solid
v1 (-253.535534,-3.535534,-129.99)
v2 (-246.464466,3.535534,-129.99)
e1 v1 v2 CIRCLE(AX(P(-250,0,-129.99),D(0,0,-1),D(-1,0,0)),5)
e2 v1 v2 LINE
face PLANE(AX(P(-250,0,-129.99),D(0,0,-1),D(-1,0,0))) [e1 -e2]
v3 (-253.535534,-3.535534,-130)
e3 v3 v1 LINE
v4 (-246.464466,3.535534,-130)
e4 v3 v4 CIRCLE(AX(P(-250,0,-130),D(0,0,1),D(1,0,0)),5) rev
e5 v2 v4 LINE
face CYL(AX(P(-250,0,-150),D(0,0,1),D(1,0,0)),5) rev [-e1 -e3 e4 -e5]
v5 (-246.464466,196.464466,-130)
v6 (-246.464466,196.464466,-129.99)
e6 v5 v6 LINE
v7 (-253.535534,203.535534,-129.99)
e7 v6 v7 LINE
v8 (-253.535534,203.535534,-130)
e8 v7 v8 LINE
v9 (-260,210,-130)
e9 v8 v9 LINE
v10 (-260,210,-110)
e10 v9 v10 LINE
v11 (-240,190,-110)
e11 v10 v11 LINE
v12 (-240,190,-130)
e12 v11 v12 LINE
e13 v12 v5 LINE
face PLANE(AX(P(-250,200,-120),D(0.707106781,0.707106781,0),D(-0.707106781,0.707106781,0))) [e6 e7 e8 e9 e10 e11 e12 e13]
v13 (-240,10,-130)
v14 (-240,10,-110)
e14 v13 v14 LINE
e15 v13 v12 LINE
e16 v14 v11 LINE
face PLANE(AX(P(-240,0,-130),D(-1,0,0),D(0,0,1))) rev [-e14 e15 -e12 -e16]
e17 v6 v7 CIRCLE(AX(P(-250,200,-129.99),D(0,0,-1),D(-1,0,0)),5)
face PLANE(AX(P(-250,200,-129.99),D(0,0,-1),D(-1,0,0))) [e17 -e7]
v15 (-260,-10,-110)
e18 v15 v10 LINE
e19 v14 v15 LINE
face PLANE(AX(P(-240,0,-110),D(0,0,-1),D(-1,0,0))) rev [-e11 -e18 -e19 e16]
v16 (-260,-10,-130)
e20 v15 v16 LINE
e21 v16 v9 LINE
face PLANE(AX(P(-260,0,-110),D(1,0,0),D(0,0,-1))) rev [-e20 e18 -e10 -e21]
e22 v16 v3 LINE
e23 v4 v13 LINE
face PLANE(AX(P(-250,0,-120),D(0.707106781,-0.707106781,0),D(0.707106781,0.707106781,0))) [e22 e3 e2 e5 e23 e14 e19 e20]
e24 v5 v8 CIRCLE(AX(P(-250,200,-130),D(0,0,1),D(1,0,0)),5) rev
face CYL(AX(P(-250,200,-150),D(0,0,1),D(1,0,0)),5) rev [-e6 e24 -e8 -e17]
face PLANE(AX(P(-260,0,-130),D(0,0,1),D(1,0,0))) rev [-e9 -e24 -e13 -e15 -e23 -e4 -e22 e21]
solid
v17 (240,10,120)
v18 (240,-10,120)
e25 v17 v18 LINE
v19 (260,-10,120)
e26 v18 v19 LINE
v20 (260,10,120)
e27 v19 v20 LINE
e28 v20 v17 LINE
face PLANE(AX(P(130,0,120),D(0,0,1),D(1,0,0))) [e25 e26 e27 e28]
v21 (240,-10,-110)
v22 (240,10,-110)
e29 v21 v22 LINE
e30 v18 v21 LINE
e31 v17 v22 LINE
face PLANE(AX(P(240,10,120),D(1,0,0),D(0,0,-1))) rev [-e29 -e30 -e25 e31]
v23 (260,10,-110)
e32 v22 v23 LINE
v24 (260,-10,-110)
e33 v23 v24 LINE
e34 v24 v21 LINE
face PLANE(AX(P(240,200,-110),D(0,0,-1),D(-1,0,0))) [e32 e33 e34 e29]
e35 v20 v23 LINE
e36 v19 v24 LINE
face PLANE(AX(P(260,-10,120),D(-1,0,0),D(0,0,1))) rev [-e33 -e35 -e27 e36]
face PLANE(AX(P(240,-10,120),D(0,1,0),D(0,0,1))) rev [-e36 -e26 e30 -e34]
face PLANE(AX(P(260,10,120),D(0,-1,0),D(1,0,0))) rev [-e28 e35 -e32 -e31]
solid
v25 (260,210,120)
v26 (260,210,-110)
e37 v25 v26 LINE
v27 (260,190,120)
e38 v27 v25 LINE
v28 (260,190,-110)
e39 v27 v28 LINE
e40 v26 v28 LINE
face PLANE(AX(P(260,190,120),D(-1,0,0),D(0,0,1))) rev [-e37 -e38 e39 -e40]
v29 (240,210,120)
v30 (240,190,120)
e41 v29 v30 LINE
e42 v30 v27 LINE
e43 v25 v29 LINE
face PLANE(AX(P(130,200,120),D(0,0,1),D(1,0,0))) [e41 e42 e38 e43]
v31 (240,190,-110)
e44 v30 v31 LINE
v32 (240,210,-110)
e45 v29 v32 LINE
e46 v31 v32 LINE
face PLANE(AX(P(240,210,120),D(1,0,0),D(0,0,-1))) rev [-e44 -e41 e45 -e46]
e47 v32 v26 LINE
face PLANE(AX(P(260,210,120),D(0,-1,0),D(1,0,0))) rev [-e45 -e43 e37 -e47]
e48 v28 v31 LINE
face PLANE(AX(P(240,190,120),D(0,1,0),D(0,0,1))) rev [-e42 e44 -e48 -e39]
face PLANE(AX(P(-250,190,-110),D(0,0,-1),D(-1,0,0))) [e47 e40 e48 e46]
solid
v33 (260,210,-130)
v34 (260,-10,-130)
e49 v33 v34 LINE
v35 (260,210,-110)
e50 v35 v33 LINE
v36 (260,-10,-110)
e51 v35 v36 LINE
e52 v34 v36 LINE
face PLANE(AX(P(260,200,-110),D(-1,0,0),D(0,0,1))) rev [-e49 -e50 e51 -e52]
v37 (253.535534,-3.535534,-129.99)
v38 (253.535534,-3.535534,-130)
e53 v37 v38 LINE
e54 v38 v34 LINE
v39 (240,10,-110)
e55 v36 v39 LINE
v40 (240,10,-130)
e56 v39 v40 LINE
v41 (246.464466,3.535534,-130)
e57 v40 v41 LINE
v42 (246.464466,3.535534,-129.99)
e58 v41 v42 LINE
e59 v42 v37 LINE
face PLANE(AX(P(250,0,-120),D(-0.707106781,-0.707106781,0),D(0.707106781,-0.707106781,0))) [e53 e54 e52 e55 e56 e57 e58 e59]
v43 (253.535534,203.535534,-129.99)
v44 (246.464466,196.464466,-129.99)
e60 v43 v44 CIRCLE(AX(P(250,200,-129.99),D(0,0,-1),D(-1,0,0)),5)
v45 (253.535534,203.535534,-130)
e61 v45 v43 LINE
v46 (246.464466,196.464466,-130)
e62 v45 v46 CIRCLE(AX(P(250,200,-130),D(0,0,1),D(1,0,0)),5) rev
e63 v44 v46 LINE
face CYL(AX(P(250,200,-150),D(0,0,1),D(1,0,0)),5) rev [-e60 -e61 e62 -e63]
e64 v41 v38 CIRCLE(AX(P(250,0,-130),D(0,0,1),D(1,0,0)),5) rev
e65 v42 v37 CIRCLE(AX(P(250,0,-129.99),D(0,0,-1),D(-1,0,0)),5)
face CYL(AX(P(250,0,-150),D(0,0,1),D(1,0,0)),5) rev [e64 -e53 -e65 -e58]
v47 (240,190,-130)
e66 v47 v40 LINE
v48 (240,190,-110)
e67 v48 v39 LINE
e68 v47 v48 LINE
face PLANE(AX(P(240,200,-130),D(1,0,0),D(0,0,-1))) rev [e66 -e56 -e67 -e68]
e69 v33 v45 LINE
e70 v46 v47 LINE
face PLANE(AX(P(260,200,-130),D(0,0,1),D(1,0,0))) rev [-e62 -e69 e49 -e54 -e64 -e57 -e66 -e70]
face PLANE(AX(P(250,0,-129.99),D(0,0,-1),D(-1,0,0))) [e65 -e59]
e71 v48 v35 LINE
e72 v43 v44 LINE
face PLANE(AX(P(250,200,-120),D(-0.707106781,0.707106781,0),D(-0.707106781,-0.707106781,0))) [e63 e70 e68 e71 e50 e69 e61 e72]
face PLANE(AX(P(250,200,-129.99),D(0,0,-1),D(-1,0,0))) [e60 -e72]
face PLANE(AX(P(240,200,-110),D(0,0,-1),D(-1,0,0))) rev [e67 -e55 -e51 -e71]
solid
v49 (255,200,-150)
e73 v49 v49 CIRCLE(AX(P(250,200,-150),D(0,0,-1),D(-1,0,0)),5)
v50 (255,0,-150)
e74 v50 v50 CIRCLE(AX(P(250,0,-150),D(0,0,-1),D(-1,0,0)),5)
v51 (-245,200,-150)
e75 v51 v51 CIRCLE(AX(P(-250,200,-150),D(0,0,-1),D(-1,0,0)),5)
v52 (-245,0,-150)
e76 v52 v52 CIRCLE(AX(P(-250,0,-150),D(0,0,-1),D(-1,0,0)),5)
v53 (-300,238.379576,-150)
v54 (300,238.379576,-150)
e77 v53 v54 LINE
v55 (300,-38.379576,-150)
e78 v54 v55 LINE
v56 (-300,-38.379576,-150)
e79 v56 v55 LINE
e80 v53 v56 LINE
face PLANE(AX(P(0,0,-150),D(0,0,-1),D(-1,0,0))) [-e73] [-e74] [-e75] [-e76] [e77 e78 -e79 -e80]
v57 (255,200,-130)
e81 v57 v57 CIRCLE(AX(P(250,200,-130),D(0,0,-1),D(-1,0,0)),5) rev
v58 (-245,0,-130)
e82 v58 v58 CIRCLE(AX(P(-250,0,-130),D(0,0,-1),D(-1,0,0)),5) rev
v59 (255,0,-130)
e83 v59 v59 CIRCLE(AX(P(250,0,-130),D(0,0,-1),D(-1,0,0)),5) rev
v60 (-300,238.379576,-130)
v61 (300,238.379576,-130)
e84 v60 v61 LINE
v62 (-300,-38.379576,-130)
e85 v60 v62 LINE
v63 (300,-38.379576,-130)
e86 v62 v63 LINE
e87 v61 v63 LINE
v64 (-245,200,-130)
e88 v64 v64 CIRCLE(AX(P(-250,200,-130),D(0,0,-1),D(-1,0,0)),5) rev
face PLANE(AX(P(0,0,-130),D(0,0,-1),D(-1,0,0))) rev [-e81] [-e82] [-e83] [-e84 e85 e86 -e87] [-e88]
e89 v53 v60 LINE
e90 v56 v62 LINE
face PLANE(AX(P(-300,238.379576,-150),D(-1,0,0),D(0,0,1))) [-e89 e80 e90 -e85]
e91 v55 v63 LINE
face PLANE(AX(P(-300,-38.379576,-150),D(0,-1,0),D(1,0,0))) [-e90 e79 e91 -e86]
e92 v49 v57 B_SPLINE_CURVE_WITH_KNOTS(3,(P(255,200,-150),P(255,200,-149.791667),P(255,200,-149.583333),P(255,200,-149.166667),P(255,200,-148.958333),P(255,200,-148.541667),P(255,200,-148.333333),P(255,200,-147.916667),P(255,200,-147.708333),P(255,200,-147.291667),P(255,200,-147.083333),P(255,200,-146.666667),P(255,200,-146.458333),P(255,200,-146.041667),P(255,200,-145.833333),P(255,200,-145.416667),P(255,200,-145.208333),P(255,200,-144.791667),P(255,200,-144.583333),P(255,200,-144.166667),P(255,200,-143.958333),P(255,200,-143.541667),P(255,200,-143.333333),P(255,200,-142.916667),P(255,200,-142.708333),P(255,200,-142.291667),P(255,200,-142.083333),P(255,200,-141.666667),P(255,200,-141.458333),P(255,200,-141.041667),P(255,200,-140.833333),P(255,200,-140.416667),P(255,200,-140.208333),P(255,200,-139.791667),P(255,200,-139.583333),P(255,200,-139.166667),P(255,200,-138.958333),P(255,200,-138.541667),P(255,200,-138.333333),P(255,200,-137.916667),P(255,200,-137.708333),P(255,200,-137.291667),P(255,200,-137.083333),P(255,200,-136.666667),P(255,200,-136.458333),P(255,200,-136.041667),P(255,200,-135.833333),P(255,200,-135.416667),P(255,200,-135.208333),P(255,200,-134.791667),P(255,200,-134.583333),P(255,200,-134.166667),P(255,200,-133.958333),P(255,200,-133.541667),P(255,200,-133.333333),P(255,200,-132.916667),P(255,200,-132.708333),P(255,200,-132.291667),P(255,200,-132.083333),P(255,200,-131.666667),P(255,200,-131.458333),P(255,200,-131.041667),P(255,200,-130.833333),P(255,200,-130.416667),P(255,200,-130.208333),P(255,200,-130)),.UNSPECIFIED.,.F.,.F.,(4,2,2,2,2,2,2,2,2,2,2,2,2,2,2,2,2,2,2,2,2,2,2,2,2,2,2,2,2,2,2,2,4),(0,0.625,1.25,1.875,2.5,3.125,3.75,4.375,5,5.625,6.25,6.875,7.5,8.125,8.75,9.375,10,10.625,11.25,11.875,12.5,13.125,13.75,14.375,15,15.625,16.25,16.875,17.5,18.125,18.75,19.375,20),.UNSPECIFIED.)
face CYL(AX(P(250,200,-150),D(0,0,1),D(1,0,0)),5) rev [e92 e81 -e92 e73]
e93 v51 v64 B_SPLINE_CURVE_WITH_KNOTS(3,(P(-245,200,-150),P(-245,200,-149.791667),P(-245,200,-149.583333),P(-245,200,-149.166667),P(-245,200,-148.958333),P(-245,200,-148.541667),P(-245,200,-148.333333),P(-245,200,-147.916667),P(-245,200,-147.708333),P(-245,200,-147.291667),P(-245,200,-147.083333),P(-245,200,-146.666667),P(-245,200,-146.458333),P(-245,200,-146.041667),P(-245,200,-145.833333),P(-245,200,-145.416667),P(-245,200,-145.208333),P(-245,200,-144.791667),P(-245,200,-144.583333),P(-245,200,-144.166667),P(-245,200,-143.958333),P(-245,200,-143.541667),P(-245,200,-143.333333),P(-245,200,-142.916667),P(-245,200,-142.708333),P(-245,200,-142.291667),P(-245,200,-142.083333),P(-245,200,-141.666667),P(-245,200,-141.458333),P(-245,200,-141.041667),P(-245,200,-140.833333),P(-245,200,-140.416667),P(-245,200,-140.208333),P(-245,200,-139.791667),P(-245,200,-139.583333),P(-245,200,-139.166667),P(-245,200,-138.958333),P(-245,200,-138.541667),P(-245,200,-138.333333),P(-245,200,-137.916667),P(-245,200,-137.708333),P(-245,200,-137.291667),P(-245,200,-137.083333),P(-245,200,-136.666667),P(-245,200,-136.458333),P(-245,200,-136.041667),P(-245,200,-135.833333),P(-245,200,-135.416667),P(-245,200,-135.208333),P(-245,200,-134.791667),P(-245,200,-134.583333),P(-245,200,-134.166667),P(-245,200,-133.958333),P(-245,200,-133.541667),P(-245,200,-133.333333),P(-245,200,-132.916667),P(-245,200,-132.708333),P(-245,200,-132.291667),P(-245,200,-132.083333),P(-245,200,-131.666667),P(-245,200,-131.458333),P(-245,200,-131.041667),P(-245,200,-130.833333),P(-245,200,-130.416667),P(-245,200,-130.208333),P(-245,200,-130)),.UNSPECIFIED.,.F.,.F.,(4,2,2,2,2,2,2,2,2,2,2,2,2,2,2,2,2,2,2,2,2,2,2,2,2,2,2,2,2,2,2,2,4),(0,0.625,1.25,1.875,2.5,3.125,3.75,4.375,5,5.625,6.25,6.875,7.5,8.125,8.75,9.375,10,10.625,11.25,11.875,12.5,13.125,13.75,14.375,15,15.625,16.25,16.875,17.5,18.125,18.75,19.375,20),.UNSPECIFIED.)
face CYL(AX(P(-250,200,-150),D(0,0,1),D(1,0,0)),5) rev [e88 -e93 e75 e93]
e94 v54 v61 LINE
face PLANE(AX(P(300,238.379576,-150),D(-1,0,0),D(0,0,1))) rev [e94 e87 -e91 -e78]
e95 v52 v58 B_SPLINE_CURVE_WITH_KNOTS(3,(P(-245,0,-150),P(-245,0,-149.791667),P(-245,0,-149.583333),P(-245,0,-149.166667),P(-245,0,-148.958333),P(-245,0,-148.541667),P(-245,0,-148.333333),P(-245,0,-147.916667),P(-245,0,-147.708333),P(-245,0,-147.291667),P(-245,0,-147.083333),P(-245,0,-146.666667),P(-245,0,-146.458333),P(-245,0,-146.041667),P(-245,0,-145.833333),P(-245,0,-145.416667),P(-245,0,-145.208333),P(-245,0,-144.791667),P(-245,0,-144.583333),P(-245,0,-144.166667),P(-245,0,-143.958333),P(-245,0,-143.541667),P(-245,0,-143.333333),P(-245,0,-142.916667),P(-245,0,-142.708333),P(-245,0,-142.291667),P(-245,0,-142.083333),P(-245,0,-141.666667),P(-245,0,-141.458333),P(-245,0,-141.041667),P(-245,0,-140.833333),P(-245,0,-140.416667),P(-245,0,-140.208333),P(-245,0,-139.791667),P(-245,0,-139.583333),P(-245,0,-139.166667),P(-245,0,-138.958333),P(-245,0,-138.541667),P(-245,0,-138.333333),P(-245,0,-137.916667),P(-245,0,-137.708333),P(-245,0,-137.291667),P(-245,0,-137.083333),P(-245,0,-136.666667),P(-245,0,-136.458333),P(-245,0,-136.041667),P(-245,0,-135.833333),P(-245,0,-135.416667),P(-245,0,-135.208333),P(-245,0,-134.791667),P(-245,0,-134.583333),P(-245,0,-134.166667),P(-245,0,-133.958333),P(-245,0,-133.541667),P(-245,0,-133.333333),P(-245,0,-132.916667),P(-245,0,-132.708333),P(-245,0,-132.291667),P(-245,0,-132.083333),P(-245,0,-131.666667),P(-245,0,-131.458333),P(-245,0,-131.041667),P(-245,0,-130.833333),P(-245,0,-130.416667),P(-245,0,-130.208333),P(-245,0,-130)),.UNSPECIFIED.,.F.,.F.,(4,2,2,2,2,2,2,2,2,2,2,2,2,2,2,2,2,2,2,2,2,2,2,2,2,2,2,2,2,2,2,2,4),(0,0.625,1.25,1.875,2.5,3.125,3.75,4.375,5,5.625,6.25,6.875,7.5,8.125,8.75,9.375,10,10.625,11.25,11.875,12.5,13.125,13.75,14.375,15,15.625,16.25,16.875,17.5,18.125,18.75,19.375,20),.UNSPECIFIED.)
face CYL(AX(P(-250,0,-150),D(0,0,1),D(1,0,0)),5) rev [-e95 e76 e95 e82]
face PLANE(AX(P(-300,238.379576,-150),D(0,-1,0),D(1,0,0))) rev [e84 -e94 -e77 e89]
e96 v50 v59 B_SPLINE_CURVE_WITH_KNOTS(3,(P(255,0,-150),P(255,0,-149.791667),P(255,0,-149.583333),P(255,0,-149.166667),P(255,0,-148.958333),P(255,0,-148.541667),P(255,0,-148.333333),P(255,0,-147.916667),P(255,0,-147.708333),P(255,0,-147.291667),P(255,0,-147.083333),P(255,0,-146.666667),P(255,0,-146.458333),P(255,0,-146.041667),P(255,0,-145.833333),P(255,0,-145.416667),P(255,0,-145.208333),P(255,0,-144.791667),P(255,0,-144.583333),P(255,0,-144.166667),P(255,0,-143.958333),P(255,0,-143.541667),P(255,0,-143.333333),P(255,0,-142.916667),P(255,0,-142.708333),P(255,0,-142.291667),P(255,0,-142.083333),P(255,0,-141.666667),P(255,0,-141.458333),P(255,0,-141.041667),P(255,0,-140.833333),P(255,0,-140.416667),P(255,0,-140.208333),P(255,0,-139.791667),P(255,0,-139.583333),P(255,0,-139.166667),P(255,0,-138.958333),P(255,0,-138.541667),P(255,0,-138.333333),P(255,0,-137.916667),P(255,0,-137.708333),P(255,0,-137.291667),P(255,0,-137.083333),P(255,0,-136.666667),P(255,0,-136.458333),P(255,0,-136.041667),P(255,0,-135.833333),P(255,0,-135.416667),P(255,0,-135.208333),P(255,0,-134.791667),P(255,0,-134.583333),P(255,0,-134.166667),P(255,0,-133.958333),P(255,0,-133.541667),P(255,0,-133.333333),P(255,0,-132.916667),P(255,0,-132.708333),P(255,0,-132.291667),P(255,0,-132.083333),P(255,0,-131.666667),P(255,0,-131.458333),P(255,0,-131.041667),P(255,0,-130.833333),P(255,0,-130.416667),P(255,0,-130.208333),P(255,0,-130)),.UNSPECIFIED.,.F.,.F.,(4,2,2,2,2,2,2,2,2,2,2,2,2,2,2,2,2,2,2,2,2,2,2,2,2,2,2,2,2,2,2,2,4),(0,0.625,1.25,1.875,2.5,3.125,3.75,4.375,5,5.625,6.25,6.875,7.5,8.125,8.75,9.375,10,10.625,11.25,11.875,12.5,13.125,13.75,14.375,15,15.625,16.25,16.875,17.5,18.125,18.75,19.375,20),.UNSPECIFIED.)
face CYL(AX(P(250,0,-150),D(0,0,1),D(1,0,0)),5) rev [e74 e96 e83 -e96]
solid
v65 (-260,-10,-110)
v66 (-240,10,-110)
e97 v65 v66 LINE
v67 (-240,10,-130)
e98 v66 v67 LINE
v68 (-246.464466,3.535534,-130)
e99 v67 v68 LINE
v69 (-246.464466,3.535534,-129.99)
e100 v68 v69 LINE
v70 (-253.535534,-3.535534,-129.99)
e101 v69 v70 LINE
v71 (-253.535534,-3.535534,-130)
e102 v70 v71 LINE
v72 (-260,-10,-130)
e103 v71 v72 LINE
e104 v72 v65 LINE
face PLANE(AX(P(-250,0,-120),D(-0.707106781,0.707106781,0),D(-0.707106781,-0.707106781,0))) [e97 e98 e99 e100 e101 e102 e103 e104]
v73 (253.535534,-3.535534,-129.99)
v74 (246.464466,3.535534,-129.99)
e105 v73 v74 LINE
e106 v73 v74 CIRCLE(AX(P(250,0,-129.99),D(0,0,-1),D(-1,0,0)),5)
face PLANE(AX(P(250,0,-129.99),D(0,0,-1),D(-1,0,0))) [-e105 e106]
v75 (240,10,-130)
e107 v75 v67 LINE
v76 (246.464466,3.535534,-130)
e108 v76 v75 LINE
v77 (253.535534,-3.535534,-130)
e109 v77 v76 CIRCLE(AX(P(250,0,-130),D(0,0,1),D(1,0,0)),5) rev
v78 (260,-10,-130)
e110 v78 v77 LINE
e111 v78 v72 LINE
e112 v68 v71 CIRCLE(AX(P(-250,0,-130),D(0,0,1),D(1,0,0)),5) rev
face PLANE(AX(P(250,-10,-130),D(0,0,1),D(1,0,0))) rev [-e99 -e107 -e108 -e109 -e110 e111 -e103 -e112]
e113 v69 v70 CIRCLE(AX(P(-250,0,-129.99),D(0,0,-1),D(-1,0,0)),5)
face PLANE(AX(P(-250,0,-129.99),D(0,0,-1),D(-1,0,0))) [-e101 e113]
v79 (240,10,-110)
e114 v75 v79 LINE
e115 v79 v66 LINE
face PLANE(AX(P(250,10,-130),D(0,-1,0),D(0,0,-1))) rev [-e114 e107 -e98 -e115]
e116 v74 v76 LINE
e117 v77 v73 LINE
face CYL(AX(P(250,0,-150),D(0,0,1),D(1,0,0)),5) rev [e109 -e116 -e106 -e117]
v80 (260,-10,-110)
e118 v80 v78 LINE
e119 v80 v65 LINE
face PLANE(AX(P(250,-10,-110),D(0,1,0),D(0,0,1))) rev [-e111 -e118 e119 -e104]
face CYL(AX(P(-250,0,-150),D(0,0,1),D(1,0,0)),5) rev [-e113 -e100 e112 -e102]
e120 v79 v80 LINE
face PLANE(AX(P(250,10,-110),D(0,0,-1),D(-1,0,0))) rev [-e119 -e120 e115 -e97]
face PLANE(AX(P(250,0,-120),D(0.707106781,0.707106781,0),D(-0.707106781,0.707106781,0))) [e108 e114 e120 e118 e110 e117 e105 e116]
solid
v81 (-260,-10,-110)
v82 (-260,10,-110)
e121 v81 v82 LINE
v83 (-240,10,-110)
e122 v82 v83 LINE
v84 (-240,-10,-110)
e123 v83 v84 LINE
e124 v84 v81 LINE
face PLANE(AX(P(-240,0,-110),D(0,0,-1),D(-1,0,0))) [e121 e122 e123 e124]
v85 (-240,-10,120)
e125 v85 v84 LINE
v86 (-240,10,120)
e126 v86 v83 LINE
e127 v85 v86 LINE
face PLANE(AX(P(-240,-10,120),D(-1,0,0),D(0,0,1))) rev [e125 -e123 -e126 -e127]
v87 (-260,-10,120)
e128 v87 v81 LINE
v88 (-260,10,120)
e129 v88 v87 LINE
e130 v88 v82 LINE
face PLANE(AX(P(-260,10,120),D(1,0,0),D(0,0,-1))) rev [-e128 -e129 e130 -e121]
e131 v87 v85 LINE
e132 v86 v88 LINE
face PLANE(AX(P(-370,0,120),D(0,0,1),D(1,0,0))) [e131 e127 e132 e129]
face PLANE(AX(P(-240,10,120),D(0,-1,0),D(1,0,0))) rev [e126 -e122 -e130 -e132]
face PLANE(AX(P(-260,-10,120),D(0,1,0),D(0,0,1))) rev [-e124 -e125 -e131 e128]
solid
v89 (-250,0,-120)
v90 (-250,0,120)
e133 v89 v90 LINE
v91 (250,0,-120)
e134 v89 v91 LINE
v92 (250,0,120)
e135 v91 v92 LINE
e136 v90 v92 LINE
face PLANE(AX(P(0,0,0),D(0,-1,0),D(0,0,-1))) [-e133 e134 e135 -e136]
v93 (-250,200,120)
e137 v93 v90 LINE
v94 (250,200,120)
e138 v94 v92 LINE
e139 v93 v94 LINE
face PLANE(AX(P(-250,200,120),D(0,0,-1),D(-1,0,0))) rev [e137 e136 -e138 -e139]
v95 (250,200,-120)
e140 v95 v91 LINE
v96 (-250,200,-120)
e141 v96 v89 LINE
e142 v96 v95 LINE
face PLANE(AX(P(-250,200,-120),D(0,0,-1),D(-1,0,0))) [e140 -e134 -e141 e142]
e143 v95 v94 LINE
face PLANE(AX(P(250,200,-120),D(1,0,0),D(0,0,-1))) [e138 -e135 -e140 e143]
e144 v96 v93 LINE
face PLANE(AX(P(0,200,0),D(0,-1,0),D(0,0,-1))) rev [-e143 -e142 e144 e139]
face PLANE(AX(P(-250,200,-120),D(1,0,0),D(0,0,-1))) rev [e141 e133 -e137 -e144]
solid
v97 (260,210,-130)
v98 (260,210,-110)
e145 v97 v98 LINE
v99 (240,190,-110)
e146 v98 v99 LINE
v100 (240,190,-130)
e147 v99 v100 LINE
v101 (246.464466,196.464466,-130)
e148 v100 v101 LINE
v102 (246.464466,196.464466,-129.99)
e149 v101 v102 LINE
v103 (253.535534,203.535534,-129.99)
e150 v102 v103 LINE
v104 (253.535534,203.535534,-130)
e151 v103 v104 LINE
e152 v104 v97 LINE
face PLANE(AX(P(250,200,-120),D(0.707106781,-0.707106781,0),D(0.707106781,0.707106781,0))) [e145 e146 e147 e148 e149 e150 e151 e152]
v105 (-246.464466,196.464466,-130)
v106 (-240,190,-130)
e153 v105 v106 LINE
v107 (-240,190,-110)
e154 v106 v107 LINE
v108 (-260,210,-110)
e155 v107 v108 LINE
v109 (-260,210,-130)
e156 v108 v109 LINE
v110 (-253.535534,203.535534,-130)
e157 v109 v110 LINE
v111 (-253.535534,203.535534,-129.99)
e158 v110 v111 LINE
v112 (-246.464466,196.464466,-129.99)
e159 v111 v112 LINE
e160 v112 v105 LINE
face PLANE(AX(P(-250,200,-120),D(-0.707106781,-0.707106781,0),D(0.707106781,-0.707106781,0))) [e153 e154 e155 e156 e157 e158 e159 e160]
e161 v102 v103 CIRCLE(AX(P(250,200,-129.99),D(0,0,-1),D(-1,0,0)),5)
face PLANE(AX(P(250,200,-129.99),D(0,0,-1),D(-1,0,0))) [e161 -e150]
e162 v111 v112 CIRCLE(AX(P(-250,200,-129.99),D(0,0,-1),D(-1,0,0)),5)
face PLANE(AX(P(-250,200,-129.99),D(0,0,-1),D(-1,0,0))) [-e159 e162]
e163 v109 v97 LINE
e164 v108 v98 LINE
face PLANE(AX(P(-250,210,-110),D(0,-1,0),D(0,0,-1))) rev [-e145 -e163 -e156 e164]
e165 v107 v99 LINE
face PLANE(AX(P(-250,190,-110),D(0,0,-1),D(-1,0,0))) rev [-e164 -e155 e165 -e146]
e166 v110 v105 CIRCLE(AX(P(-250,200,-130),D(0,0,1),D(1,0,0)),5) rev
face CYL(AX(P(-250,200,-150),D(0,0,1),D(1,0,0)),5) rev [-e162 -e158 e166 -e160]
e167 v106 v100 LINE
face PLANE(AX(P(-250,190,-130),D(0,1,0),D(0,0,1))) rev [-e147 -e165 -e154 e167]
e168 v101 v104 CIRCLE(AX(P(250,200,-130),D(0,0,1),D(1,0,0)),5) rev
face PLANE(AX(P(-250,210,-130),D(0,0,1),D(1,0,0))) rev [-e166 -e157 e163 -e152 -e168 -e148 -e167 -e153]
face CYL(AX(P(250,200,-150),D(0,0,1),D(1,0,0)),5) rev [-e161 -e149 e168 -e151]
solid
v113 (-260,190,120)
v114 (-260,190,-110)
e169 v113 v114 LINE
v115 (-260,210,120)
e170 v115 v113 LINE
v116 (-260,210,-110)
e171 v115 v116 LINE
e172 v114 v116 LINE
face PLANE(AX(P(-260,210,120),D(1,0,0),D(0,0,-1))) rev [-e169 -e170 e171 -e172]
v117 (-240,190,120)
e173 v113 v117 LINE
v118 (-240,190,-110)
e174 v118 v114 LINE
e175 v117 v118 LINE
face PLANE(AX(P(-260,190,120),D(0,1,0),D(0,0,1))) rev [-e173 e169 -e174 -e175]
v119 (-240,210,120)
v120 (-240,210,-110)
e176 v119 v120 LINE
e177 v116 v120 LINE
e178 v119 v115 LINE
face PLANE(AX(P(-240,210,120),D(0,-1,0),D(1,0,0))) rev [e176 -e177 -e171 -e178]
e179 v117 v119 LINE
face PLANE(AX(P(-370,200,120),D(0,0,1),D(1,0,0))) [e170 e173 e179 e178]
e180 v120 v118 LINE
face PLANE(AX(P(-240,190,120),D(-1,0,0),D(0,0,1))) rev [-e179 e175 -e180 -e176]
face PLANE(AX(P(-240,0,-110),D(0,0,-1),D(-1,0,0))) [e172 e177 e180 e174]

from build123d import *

# Parameters (mm, degrees)
SKETCH2_W                               = 500
SKETCH2_H                               = 240
BOSS_EXTRUDE1_DEPTH                     = 200
SQUARE_RODS_START                       = -10
SQUARE_RODS_SQUARE_BAR_20_2_OUTLINE_W   = 20
SQUARE_RODS_SQUARE_BAR_20_2_OUTLINE_H   = 230
SQUARE_RODS_SQUARE_BAR_20_2_DEPTH       = 20
SQUARE_RODS_START_2                     = -130
SQUARE_RODS_SQUARE_BAR_20_2_2_DEPTH     = 20
SQUARE_RODS_SQUARE_BAR_20_2_3_DEPTH     = 20
SQUARE_RODS_SQUARE_BAR_20_2_4_OUTLINE_W = 20
SQUARE_RODS_SQUARE_BAR_20_2_4_OUTLINE_H = 230
SQUARE_RODS_SQUARE_BAR_20_2_4_DEPTH     = 20
SQUARE_RODS_SQUARE_BAR_20_2_5_DEPTH     = 20
SQUARE_RODS_START_3                     = 190
SQUARE_RODS_SQUARE_BAR_20_2_6_OUTLINE_W = 20
SQUARE_RODS_SQUARE_BAR_20_2_6_OUTLINE_H = 230
SQUARE_RODS_SQUARE_BAR_20_2_6_DEPTH     = 20
SQUARE_RODS_SQUARE_BAR_20_2_7_DEPTH     = 20
SQUARE_RODS_SQUARE_BAR_20_2_8_OUTLINE_W = 20
SQUARE_RODS_SQUARE_BAR_20_2_8_OUTLINE_H = 230
SQUARE_RODS_SQUARE_BAR_20_2_8_DEPTH     = 20
SKETCH8_W                               = 600
SKETCH8_H                               = 276.75915278
BOSS_EXTRUDE2_DEPTH                     = 20
CUT_EXTRUDE4_DEPTH                      = 458.520297298
CUT_EXTRUDE4_DEPTH_BACK                 = 0.01
SKETCH9_R                               = 5


# Read off the part's stored shape, not the designer's step: Square-rods SQUARE BAR 20(2)
with BuildPart() as part:
    # Sketch2 → Boss-Extrude1 (new body)
    with BuildSketch(Plane(origin=(0, 0, 0), x_dir=(1, 0, 0), z_dir=(0, 1, 0))):
        Rectangle(SKETCH2_W, SKETCH2_H)
    extrude(amount=BOSS_EXTRUDE1_DEPTH)


with BuildPart() as body_2:
    # Square-rods SQUARE BAR 20(2) outline → Square-rods SQUARE BAR 20(2) (new body)
    with BuildSketch(Plane(origin=(0, 0, 0), x_dir=(1, 0, 0), z_dir=(0, 1, 0)).offset(SQUARE_RODS_START)):
        with Locations((-250, -5)):
            Rectangle(SQUARE_RODS_SQUARE_BAR_20_2_OUTLINE_W, SQUARE_RODS_SQUARE_BAR_20_2_OUTLINE_H)
    extrude(amount=SQUARE_RODS_SQUARE_BAR_20_2_DEPTH)


with BuildPart() as body_3:
    # Square-rods SQUARE BAR 20_2 2 outline → Square-rods SQUARE BAR 20_2 2 (new body)
    with BuildSketch(Plane.XY.offset(SQUARE_RODS_START_2)):
        Polygon((-260, -10), (260, -10), (240, 10), (-240, 10), align=None)
    extrude(amount=SQUARE_RODS_SQUARE_BAR_20_2_2_DEPTH)


with BuildPart() as body_4:
    # Square-rods SQUARE BAR 20_2 3 outline → Square-rods SQUARE BAR 20_2 3 (new body)
    with BuildSketch(Plane.XY.offset(SQUARE_RODS_START_2)):
        Polygon((-260, 210), (-260, -10), (-240, 10), (-240, 190), align=None)
    extrude(amount=SQUARE_RODS_SQUARE_BAR_20_2_3_DEPTH)


with BuildPart() as body_5:
    # Square-rods SQUARE BAR 20_2 4 outline → Square-rods SQUARE BAR 20_2 4 (new body)
    with BuildSketch(Plane(origin=(0, 0, 0), x_dir=(1, 0, 0), z_dir=(0, 1, 0)).offset(SQUARE_RODS_START)):
        with Locations((250, -5)):
            Rectangle(SQUARE_RODS_SQUARE_BAR_20_2_4_OUTLINE_W, SQUARE_RODS_SQUARE_BAR_20_2_4_OUTLINE_H)
    extrude(amount=SQUARE_RODS_SQUARE_BAR_20_2_4_DEPTH)


with BuildPart() as body_6:
    # Square-rods SQUARE BAR 20_2 5 outline → Square-rods SQUARE BAR 20_2 5 (new body)
    with BuildSketch(Plane.XY.offset(SQUARE_RODS_START_2)):
        Polygon((260, -10), (260, 210), (240, 190), (240, 10), align=None)
    extrude(amount=SQUARE_RODS_SQUARE_BAR_20_2_5_DEPTH)


with BuildPart() as body_7:
    # Square-rods SQUARE BAR 20_2 6 outline → Square-rods SQUARE BAR 20_2 6 (new body)
    with BuildSketch(Plane(origin=(0, 0, 0), x_dir=(1, 0, 0), z_dir=(0, 1, 0)).offset(SQUARE_RODS_START_3)):
        with Locations((250, -5)):
            Rectangle(SQUARE_RODS_SQUARE_BAR_20_2_6_OUTLINE_W, SQUARE_RODS_SQUARE_BAR_20_2_6_OUTLINE_H)
    extrude(amount=SQUARE_RODS_SQUARE_BAR_20_2_6_DEPTH)


with BuildPart() as body_8:
    # Square-rods SQUARE BAR 20_2 7 outline → Square-rods SQUARE BAR 20_2 7 (new body)
    with BuildSketch(Plane.XY.offset(SQUARE_RODS_START_2)):
        Polygon((260, 210), (-260, 210), (-240, 190), (240, 190), align=None)
    extrude(amount=SQUARE_RODS_SQUARE_BAR_20_2_7_DEPTH)


with BuildPart() as body_9:
    # Square-rods SQUARE BAR 20_2 8 outline → Square-rods SQUARE BAR 20_2 8 (new body)
    with BuildSketch(Plane(origin=(0, 0, 0), x_dir=(1, 0, 0), z_dir=(0, 1, 0)).offset(SQUARE_RODS_START_3)):
        with Locations((-250, -5)):
            Rectangle(SQUARE_RODS_SQUARE_BAR_20_2_8_OUTLINE_W, SQUARE_RODS_SQUARE_BAR_20_2_8_OUTLINE_H)
    extrude(amount=SQUARE_RODS_SQUARE_BAR_20_2_8_DEPTH)


with BuildPart() as body_10:
    # Sketch8 → Boss-Extrude2 (new body)
    with BuildSketch(Plane(origin=(0, 0, -130), x_dir=(-1, 0, 0), z_dir=(0, 0, -1))):
        with Locations((0, 100)):
            Rectangle(SKETCH8_W, SKETCH8_H)
    extrude(amount=BOSS_EXTRUDE2_DEPTH)


with BuildPart() as cut_extrude4_tool:
    # Sketch9 → Cut-Extrude4 (new, two sides: drawn at the far end of the back side and taken through both)
    with BuildSketch(Plane(origin=(0, 0, -130), x_dir=(-1, 0, 0), z_dir=(0, 0, -1)).offset(-CUT_EXTRUDE4_DEPTH_BACK)):
        with Locations(Location((-250, 200, 0), (0, 0, 180))):
            Circle(SKETCH9_R)
        with Locations(Location((250, 200, 0), (0, 0, 180))):
            Circle(SKETCH9_R)
        with Locations(Location((250, 0, 0), (0, 0, 180))):
            Circle(SKETCH9_R)
        with Locations(Location((-250, 0, 0), (0, 0, 180))):
            Circle(SKETCH9_R)
    extrude(amount=CUT_EXTRUDE4_DEPTH + CUT_EXTRUDE4_DEPTH_BACK)


with BuildPart() as body_3_1:
    add(body_3.part)

    # Cut-Extrude4: cut by cut_extrude4_tool
    add(cut_extrude4_tool.part, mode=Mode.SUBTRACT)


with BuildPart() as body_4_1:
    add(body_4.part)

    # Cut-Extrude4: cut by cut_extrude4_tool
    add(cut_extrude4_tool.part, mode=Mode.SUBTRACT)


with BuildPart() as body_6_1:
    add(body_6.part)

    # Cut-Extrude4: cut by cut_extrude4_tool
    add(cut_extrude4_tool.part, mode=Mode.SUBTRACT)


with BuildPart() as body_8_1:
    add(body_8.part)

    # Cut-Extrude4: cut by cut_extrude4_tool
    add(cut_extrude4_tool.part, mode=Mode.SUBTRACT)


with BuildPart() as body_10_1:
    add(body_10.part)

    # Cut-Extrude4: cut by cut_extrude4_tool
    add(cut_extrude4_tool.part, mode=Mode.SUBTRACT)


solid = Compound([part.part, body_2.part, body_5.part, body_7.part, body_9.part, body_3_1.part, body_4_1.part, body_6_1.part, body_8_1.part, body_10_1.part])
